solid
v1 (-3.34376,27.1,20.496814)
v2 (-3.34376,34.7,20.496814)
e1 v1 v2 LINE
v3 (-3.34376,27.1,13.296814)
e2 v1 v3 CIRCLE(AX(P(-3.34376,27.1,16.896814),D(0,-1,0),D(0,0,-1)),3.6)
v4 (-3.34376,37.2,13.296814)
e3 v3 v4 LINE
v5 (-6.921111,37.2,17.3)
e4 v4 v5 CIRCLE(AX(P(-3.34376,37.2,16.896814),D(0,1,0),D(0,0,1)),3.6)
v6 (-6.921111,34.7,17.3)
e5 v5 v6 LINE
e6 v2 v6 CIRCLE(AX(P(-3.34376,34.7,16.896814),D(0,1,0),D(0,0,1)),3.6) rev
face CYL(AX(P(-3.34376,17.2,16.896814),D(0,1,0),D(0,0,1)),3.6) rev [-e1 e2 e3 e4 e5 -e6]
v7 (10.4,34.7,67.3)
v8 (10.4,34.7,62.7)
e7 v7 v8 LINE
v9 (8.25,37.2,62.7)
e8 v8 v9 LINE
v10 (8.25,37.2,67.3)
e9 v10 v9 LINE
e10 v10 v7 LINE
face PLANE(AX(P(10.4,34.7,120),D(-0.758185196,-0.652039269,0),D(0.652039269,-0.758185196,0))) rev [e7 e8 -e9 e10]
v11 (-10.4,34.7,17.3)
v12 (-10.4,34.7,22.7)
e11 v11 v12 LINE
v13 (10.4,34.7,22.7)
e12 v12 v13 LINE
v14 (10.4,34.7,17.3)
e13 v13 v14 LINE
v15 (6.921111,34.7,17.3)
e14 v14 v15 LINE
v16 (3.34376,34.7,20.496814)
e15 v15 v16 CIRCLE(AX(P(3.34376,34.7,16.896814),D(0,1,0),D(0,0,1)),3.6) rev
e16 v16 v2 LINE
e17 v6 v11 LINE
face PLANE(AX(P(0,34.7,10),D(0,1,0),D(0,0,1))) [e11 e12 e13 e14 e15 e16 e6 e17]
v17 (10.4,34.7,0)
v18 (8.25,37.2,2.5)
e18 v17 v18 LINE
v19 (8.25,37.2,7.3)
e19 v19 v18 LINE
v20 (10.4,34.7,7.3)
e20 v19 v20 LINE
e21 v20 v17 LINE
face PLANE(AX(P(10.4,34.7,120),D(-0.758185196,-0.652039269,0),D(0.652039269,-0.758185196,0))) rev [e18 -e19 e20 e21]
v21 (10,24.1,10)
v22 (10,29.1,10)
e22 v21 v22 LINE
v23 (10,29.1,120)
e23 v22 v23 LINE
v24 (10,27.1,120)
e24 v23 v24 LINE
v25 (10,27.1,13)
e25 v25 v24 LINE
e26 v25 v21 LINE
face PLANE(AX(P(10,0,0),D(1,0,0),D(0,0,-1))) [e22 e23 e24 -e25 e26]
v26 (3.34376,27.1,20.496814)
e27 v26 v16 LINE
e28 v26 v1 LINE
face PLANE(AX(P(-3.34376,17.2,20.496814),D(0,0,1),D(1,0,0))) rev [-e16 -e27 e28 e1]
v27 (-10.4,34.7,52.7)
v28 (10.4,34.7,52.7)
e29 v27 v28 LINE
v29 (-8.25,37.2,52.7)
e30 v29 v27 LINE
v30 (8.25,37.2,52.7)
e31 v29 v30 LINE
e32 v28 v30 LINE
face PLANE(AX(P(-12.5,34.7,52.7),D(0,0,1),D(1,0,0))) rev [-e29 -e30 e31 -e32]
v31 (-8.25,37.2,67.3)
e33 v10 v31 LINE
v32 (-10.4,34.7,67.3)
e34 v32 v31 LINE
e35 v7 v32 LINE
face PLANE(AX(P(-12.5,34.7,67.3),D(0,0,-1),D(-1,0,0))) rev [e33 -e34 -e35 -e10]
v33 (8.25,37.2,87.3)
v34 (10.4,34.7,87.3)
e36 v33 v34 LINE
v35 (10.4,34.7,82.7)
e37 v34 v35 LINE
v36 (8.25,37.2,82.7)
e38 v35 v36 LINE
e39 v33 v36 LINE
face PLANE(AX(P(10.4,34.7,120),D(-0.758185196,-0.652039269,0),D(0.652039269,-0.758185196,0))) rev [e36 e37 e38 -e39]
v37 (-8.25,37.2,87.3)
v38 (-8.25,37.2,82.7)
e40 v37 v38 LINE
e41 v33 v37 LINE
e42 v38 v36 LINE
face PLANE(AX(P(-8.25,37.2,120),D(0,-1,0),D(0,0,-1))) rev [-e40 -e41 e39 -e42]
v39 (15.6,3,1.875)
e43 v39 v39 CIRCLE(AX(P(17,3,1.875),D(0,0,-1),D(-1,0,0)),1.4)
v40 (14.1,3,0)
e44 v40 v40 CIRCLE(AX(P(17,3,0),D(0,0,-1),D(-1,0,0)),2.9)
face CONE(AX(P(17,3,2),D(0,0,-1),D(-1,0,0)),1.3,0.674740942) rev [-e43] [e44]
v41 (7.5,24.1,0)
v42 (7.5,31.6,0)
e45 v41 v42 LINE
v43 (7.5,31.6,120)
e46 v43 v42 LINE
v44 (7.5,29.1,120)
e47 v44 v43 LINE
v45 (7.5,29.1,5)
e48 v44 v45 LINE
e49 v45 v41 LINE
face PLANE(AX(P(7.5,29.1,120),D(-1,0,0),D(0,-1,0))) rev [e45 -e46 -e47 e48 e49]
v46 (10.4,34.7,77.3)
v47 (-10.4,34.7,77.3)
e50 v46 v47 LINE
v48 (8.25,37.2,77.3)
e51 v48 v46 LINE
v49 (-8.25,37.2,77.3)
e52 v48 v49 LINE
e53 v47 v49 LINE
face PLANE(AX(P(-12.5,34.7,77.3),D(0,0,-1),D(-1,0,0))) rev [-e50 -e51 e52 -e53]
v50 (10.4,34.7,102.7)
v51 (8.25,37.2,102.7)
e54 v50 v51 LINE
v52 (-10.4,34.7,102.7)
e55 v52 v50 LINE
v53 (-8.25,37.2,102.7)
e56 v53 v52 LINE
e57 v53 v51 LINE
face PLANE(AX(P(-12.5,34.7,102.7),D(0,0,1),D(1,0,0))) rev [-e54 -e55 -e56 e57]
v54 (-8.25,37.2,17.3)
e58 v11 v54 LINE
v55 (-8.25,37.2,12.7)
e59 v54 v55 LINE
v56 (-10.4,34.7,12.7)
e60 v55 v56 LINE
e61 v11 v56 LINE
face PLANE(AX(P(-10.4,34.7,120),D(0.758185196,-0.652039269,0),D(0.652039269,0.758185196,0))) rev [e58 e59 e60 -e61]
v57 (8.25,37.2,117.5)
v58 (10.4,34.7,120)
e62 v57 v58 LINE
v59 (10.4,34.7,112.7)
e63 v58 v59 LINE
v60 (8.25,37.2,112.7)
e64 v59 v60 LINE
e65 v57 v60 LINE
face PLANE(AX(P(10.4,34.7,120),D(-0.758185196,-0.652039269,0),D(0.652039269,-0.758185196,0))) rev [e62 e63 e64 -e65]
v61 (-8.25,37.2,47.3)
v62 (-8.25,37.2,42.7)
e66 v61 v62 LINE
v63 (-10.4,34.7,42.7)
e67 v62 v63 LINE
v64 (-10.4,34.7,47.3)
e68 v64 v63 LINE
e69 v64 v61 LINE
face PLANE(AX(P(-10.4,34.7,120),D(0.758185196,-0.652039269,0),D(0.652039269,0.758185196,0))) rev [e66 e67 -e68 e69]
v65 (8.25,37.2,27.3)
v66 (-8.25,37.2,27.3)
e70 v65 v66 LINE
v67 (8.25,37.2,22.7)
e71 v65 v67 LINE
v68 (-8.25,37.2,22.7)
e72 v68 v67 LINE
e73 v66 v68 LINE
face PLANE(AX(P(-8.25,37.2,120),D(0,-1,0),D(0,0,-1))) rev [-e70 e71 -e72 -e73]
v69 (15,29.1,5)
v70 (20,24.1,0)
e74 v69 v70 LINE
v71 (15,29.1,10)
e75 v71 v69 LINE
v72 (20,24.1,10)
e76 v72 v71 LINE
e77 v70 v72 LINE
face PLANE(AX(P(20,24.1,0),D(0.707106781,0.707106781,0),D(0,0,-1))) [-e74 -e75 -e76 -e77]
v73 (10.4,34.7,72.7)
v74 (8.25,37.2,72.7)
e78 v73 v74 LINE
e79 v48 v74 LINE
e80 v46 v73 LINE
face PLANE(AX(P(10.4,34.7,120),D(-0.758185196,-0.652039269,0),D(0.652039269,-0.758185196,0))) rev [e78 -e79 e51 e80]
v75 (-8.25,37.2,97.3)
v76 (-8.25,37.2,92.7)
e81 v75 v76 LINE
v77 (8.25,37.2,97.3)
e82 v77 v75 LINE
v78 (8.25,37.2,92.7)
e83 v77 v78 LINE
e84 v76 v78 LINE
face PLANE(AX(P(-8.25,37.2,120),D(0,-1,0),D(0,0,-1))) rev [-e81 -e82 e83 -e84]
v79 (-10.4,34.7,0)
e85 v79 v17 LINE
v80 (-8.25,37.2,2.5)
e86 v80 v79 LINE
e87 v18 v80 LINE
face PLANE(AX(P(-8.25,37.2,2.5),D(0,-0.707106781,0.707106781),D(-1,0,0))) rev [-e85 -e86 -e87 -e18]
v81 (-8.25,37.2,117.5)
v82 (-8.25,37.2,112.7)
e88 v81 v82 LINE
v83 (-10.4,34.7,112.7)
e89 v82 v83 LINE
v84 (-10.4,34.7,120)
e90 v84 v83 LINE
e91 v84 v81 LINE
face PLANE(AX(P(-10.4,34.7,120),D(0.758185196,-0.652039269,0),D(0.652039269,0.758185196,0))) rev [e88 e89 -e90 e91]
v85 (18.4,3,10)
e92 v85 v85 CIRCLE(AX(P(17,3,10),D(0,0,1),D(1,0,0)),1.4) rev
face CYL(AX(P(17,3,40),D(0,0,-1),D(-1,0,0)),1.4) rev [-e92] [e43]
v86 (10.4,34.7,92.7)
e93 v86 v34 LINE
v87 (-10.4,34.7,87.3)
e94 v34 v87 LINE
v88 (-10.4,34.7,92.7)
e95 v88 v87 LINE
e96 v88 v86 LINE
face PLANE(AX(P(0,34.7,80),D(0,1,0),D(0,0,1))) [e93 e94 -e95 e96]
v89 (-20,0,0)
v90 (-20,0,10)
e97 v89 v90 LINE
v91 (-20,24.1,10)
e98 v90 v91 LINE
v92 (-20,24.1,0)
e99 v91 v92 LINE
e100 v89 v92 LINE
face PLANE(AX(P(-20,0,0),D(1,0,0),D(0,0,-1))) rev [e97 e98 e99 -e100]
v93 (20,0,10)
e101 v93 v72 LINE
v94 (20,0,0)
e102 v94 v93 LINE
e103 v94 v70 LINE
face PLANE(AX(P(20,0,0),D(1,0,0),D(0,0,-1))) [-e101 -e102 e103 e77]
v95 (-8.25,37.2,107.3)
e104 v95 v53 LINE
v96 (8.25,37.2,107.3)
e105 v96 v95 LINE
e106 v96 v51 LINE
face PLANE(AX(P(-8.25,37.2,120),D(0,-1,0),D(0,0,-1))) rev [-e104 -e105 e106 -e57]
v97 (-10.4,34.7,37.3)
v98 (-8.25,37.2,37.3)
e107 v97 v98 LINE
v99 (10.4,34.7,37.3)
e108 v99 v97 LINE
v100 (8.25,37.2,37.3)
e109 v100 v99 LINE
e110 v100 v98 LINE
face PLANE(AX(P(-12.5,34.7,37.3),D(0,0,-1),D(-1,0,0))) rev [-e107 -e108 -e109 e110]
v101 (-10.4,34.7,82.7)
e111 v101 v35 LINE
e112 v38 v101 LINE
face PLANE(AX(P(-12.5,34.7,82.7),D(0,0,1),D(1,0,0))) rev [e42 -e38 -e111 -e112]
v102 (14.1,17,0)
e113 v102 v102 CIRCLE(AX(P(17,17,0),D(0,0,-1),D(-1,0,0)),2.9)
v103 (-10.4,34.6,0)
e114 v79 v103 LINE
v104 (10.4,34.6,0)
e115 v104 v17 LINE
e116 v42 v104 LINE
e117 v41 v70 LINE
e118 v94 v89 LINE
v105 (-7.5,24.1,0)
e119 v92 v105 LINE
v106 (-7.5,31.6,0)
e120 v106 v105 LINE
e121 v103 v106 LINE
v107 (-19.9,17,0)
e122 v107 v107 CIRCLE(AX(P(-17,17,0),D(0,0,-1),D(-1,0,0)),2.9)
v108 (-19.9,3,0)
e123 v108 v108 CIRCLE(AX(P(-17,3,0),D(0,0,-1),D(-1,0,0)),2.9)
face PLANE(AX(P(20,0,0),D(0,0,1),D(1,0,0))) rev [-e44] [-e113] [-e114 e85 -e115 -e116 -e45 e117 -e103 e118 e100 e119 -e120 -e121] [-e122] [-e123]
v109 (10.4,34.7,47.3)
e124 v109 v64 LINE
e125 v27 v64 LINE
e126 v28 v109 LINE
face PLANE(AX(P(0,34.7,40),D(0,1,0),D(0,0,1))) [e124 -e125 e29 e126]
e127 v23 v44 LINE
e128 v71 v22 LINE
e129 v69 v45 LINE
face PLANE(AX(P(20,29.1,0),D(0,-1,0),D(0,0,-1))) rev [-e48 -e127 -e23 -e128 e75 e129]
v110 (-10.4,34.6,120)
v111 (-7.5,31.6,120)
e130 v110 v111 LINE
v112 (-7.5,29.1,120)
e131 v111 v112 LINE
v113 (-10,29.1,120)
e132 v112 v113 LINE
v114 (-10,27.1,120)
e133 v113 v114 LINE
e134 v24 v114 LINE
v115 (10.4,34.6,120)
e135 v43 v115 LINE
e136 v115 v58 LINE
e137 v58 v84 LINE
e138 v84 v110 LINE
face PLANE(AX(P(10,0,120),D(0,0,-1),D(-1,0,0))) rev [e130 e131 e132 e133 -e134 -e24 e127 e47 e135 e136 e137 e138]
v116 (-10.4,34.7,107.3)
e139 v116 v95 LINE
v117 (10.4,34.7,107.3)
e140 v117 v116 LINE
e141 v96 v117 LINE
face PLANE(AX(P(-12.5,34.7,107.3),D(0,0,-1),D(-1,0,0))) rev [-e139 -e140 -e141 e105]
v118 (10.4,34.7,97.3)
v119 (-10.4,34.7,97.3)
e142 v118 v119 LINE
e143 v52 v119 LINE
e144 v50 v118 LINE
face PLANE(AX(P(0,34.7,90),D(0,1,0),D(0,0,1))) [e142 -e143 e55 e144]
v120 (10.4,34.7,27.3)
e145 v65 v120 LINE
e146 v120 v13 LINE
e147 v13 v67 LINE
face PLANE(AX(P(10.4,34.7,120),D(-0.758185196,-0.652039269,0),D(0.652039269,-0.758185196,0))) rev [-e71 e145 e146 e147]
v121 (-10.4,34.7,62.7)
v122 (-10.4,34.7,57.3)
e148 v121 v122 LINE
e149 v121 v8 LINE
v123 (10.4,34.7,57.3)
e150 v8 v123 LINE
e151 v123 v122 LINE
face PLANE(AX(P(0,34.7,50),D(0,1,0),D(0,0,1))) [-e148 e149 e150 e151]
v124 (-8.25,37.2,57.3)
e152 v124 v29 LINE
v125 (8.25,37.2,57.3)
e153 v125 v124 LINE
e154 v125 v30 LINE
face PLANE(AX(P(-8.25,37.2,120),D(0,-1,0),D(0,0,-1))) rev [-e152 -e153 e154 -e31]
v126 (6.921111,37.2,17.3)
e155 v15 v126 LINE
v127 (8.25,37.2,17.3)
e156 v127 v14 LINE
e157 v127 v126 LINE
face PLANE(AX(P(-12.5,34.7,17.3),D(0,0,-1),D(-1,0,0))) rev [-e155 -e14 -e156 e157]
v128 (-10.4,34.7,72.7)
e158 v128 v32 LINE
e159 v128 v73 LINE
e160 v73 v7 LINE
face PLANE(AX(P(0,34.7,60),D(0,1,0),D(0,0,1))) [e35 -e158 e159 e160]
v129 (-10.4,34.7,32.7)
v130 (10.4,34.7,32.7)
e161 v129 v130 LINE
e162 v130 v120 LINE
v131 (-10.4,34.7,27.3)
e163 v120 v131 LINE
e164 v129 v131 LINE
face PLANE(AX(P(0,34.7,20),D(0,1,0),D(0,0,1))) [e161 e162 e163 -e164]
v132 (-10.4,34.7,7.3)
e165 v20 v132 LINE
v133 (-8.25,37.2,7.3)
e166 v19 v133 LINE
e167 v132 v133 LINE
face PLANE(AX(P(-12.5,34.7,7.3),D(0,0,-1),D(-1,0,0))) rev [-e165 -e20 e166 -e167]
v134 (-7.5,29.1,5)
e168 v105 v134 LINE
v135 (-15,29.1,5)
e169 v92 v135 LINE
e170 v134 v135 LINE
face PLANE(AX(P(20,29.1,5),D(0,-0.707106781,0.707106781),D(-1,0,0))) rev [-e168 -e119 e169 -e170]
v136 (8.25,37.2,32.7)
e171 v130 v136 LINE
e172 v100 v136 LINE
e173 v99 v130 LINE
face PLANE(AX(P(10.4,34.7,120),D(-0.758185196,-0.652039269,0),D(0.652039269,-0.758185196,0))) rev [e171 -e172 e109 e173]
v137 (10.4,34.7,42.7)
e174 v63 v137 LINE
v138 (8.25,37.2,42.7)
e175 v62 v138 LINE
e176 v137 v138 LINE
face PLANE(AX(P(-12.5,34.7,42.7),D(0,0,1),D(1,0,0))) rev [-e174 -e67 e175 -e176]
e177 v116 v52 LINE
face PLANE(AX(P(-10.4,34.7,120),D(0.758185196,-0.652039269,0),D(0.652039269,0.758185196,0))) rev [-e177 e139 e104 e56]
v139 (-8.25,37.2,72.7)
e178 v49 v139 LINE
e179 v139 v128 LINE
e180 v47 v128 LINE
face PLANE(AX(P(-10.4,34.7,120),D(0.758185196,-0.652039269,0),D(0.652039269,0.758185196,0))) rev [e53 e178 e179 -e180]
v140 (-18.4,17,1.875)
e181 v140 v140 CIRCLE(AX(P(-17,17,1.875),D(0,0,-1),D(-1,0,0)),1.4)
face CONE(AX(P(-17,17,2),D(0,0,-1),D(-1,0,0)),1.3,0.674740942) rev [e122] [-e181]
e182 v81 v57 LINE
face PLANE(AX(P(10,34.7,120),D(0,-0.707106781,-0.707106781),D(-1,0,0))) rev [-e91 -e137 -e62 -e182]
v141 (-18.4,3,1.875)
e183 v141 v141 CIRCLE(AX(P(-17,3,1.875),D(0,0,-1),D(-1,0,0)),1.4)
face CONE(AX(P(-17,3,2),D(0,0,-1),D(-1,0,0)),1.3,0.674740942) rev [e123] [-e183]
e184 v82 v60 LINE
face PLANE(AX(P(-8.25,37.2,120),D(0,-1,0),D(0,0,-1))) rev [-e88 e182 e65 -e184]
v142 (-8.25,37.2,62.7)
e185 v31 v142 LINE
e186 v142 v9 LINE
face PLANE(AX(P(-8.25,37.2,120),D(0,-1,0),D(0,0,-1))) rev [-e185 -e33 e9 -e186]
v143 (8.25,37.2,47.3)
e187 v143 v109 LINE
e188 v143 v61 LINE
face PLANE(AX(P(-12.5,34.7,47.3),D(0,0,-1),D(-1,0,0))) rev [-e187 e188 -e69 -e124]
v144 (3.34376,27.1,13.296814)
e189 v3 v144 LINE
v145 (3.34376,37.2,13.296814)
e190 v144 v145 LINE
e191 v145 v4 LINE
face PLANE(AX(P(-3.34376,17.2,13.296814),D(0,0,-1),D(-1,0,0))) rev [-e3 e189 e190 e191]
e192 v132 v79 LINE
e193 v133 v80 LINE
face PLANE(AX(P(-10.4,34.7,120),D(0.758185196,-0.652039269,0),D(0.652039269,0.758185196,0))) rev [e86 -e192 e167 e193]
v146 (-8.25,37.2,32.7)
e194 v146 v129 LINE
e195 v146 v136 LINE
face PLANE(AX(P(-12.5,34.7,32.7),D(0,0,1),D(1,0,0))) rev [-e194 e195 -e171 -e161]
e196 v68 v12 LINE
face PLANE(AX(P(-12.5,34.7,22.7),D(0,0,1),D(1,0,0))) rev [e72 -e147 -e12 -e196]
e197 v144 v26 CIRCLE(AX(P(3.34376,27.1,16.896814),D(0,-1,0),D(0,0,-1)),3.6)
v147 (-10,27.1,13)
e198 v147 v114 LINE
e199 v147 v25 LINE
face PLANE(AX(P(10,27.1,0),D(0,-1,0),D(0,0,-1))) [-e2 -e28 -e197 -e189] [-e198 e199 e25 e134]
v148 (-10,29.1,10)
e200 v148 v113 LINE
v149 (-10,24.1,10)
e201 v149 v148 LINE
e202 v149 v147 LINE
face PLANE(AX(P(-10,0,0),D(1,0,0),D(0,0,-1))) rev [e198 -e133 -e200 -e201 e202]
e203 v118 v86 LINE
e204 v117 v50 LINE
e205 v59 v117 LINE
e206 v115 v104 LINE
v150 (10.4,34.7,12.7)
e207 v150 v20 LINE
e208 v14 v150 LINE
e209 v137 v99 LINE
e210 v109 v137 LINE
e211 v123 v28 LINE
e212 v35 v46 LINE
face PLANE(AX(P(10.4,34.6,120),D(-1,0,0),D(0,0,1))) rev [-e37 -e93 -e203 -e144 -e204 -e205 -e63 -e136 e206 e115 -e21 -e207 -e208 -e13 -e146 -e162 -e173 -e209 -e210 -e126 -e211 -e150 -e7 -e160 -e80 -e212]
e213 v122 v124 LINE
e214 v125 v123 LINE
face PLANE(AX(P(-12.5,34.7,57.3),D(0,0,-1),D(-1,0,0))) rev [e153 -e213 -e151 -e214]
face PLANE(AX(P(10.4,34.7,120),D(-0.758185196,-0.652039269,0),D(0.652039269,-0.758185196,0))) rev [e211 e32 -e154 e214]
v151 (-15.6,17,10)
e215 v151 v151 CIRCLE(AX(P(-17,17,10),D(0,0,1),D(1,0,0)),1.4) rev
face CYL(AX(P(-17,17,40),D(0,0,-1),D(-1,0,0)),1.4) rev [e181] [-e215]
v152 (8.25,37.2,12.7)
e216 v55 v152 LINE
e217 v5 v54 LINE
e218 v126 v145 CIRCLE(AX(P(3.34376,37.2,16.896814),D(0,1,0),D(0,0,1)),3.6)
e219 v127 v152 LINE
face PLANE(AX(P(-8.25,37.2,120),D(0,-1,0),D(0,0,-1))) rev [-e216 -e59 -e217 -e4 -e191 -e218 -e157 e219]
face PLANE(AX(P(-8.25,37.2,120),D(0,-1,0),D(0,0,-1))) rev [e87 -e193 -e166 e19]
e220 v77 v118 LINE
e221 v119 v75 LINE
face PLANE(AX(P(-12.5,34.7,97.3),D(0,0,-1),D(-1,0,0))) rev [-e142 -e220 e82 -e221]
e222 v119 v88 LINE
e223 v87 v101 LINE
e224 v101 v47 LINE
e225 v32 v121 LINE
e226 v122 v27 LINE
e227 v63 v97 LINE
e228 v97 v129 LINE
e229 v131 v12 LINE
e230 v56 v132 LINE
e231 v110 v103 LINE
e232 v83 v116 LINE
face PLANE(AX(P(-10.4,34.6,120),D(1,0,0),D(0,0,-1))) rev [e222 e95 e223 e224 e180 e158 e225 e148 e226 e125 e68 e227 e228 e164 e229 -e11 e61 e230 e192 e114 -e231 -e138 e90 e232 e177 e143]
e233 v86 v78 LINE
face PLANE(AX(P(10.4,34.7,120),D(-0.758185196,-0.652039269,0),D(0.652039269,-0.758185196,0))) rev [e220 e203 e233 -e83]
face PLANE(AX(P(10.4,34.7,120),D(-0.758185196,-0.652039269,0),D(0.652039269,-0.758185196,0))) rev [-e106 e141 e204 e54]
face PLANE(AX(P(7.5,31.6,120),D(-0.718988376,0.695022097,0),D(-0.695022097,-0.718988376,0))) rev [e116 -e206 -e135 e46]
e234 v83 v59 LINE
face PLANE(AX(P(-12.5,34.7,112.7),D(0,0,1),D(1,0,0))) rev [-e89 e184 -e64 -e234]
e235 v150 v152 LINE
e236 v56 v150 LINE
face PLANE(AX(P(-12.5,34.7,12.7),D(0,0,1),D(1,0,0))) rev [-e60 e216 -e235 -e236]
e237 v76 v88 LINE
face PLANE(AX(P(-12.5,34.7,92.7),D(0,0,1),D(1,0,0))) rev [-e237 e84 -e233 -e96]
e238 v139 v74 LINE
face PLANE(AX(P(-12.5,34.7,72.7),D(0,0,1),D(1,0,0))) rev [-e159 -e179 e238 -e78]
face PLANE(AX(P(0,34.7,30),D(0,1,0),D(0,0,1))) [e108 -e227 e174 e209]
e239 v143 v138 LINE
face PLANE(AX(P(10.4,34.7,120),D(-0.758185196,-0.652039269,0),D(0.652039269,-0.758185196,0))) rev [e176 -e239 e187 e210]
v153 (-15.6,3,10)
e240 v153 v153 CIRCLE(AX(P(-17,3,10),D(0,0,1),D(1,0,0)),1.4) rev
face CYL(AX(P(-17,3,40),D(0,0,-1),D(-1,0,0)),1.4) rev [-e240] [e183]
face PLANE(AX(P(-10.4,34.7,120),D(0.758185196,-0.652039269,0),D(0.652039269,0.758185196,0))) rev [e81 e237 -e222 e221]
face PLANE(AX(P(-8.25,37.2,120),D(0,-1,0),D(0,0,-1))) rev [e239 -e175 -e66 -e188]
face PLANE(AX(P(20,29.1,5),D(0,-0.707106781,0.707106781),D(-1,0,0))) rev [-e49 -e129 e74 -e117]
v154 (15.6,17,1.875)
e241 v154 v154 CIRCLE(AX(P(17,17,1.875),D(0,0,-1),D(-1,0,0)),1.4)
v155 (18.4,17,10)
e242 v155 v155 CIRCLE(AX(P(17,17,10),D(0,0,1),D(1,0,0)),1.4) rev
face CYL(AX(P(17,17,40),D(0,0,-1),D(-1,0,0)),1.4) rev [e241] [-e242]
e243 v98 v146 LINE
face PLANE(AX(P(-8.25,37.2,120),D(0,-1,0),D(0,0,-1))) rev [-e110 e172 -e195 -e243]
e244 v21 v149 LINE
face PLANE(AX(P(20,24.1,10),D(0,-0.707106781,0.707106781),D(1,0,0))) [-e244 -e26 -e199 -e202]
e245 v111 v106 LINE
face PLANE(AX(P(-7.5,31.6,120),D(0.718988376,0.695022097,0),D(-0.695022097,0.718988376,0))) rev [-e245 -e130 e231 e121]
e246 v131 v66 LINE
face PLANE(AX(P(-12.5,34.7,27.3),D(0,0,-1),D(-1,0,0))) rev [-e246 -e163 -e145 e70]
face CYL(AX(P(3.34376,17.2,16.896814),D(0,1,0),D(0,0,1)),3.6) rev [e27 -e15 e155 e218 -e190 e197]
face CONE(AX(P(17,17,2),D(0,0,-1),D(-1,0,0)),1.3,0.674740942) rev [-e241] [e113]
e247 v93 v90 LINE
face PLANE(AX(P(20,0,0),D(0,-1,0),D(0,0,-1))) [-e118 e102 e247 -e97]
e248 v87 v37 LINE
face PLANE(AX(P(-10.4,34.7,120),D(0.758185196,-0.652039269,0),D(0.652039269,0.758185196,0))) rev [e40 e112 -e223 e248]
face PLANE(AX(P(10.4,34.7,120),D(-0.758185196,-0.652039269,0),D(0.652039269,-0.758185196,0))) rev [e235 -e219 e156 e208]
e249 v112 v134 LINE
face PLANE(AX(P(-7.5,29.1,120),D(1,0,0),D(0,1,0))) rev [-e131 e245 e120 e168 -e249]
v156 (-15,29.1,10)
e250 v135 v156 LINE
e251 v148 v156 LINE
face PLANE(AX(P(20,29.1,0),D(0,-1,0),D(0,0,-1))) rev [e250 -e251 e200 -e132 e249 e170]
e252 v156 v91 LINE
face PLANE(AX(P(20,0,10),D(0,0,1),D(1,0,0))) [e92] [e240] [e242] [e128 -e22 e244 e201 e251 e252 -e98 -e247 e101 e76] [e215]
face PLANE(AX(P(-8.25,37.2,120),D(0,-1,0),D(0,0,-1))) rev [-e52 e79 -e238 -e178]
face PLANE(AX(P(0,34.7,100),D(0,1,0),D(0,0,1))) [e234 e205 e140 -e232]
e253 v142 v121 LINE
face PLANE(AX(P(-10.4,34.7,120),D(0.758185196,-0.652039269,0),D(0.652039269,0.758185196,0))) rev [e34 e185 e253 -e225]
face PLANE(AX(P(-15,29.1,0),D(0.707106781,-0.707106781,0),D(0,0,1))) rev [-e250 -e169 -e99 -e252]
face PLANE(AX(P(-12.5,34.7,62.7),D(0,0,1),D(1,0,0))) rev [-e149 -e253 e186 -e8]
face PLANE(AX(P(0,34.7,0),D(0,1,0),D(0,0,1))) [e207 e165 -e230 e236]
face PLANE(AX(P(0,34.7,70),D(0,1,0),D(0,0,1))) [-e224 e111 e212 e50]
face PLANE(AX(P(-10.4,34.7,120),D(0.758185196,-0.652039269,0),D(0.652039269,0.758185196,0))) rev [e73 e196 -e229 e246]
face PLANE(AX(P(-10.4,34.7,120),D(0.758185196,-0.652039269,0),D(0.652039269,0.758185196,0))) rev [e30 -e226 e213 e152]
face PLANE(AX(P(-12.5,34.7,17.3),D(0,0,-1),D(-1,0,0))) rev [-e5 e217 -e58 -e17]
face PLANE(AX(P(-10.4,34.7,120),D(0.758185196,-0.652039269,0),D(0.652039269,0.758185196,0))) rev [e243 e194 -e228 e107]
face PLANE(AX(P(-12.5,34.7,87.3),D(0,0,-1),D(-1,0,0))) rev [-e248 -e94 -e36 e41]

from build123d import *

# Parameters (mm, degrees)
EXTRUDE_1_DEPTH        = 20
SKETCH_2_R             = 1.4
CUT_EXTRUDE_1_DEPTH    = 40
SKETCH_1_3_W           = 110
SKETCH_1_3_H           = 2
EXTRUDE_2_DEPTH        = 10
EXTRUDE_3_DEPTH        = 120
CUT_EXTRUDE_2_DEPTH    = 20
SKETCH_5_W             = 25
SKETCH_5_H             = 5.4
CUT_EXTRUDE_3_DEPTH    = 2.5
PATTERN_LINEAR_1_COUNT = 11
PATTERN_LINEAR_1_PITCH = 10
CHAMFER_1_SIZE         = 3
SKETCH_6_R             = 2.9
CUT_EXTRUDE_4_DEPTH    = 2
CHAMFER_2_SIZE         = 1.6
CHAMFER_2_SIZE_2       = 2
CHAMFER_3_SIZE         = 2.5
CHAMFER_4_SIZE         = 5


with BuildPart() as part:
    # 스케치1 → 보스-돌출1 (new, symmetric)
    with BuildSketch(Plane(origin=(0, 0, 0), x_dir=(0, 0, -1), z_dir=(1, 0, 0))):
        Polygon((-10, 29.1), (-10, 27.1), (-10, 0), (0, 0), (0, 29.1), align=None)
    extrude(amount=EXTRUDE_1_DEPTH, both=True)

    # 스케치2 → 컷-돌출1 (cut)
    with BuildSketch(Plane.XY):
        with Locations((17, 3)):
            Circle(SKETCH_2_R)
        with Locations((17, 17)):
            Circle(SKETCH_2_R)
        with Locations(Location((-17, 3, 0), (0, 0, 180))):
            Circle(SKETCH_2_R)
        with Locations(Location((-17, 17, 0), (0, 0, 180))):
            Circle(SKETCH_2_R)
    extrude(amount=CUT_EXTRUDE_1_DEPTH, mode=Mode.SUBTRACT)

    # 스케치1<3> → 보스-돌출2 (add, symmetric)
    with BuildSketch(Plane(origin=(0, 0, 0), x_dir=(0, 0, -1), z_dir=(1, 0, 0))):
        with Locations((-65, 28.1)):
            Rectangle(SKETCH_1_3_W, SKETCH_1_3_H)
    extrude(amount=EXTRUDE_2_DEPTH, both=True)

    # 스케치3 → 보스-돌출3 (add)
    with BuildSketch(Plane.XY):
        Polygon((7.5, 29.1), (-7.5, 29.1), (-7.5, 31.6), (-10.4, 34.6), (-10.4, 34.7), (-8.25, 37.2), (8.25, 37.2), (10.4, 34.7), (10.4, 34.6), (7.5, 31.6), align=None)
    extrude(amount=EXTRUDE_3_DEPTH)

    # 스케치4 → 컷-돌출2 (cut)
    with BuildSketch(Plane(origin=(0, 37.2, 0), x_dir=(1, 0, 0), z_dir=(0, 1, 0))):
        with BuildLine():
            Line((-3.343759528, -13.296813629), (3.343759528, -13.296813629))
            ThreePointArc((3.343759528, -13.296813629), (6.943759528, -16.896813629), (3.343759528, -20.496813629))
            Line((3.343759528, -20.496813629), (-3.343759528, -20.496813629))
            ThreePointArc((-3.343759528, -20.496813629), (-6.943759528, -16.896813629), (-3.343759528, -13.296813629))
        make_face()
    extrude(amount=-CUT_EXTRUDE_2_DEPTH, mode=Mode.SUBTRACT)

    # 스케치5 → 컷-돌출3 (cut)
    with BuildSketch(Plane(origin=(0, 37.2, 0), x_dir=(1, 0, 0), z_dir=(0, 1, 0))):
        with Locations((0, -10)):
            Rectangle(SKETCH_5_W, SKETCH_5_H)
    cut_extrude_3 = extrude(amount=-CUT_EXTRUDE_3_DEPTH, mode=Mode.SUBTRACT)

    # 선형 패턴1: 컷-돌출3 ×11
    with Locations(*[(0, 0, i * PATTERN_LINEAR_1_PITCH) for i in range(1, PATTERN_LINEAR_1_COUNT)]):
        add(cut_extrude_3, mode=Mode.SUBTRACT)

    # 모따기1
    chamfer_1_edges = [part.edges().sort_by_distance(p)[0] for p in [
        (0, 27.1, 10),
    ]]
    chamfer(chamfer_1_edges, length=CHAMFER_1_SIZE)

    # 스케치6 → 컷-돌출4 (cut)
    with BuildSketch(Plane(origin=(0, 0, 0), x_dir=(-1, 0, 0), z_dir=(0, 0, -1))):
        with Locations((-17, 3)):
            Circle(SKETCH_6_R)
        with Locations((-17, 17)):
            Circle(SKETCH_6_R)
        with Locations((17, 17)):
            Circle(SKETCH_6_R)
        with Locations((17, 3)):
            Circle(SKETCH_6_R)
    extrude(amount=-CUT_EXTRUDE_4_DEPTH, mode=Mode.SUBTRACT)

    # 모따기2
    # the kernel refuses this chamfer: 2, 1.6 mm, written as the material it adds along each edge
    with BuildSketch(Plane(origin=(17, 3, 2), x_dir=(-1, 0, 0), z_dir=(0, -1, 0))) as chamfer_2_piece_1_section:
        Polygon((2.9 - CHAMFER_2_SIZE, 0), (2.9, CHAMFER_2_SIZE_2), (2.9, 0), align=None)
    chamfer_2_piece_1 = revolve(axis=Axis((17, 3, 2), (0, 0, -1)), mode=Mode.PRIVATE)
    chamfer_2_piece_1 = chamfer_2_piece_1 - Plane(origin=(17, 3, 0.956092246), x_dir=(1, 0, 0), z_dir=(0, 0, -1)) * Cylinder(1.4, 12, mode=Mode.PRIVATE)
    chamfer_2_piece_1 = split(chamfer_2_piece_1, bisect_by=Plane(origin=(19.173240308, 3, 0), z_dir=(0, 0, 1)), keep=Keep.TOP, mode=Mode.PRIVATE)
    add(chamfer_2_piece_1)
    with BuildSketch(Plane(origin=(-17, 3, 2), x_dir=(-1, 0, 0), z_dir=(0, -1, 0))) as chamfer_2_piece_2_section:
        Polygon((2.9 - CHAMFER_2_SIZE, 0), (2.9, CHAMFER_2_SIZE_2), (2.9, 0), align=None)
    chamfer_2_piece_2 = revolve(axis=Axis((-17, 3, 2), (0, 0, -1)), mode=Mode.PRIVATE)
    chamfer_2_piece_2 = chamfer_2_piece_2 - Plane(origin=(-17, 3, 0.956092246), x_dir=(-1, 0, 0), z_dir=(0, 0, -1)) * Cylinder(1.4, 12, mode=Mode.PRIVATE)
    chamfer_2_piece_2 = split(chamfer_2_piece_2, bisect_by=Plane(origin=(-14.826759692, 3, 0), z_dir=(0, 0, 1)), keep=Keep.TOP, mode=Mode.PRIVATE)
    add(chamfer_2_piece_2)
    with BuildSketch(Plane(origin=(-17, 17, 2), x_dir=(-1, 0, 0), z_dir=(0, -1, 0))) as chamfer_2_piece_3_section:
        Polygon((2.9 - CHAMFER_2_SIZE, 0), (2.9, CHAMFER_2_SIZE_2), (2.9, 0), align=None)
    chamfer_2_piece_3 = revolve(axis=Axis((-17, 17, 2), (0, 0, -1)), mode=Mode.PRIVATE)
    chamfer_2_piece_3 = chamfer_2_piece_3 - Plane(origin=(-17, 17, 0.956092246), x_dir=(-1, 0, 0), z_dir=(0, 0, -1)) * Cylinder(1.4, 12, mode=Mode.PRIVATE)
    chamfer_2_piece_3 = split(chamfer_2_piece_3, bisect_by=Plane(origin=(-14.826759692, 17, 0), z_dir=(0, 0, 1)), keep=Keep.TOP, mode=Mode.PRIVATE)
    add(chamfer_2_piece_3)
    with BuildSketch(Plane(origin=(17, 17, 2), x_dir=(-1, 0, 0), z_dir=(0, -1, 0))) as chamfer_2_piece_4_section:
        Polygon((2.9 - CHAMFER_2_SIZE, 0), (2.9, CHAMFER_2_SIZE_2), (2.9, 0), align=None)
    chamfer_2_piece_4 = revolve(axis=Axis((17, 17, 2), (0, 0, -1)), mode=Mode.PRIVATE)
    chamfer_2_piece_4 = chamfer_2_piece_4 - Plane(origin=(17, 17, 0.956092246), x_dir=(1, 0, 0), z_dir=(0, 0, -1)) * Cylinder(1.4, 12, mode=Mode.PRIVATE)
    chamfer_2_piece_4 = split(chamfer_2_piece_4, bisect_by=Plane(origin=(19.173240308, 17, 0), z_dir=(0, 0, 1)), keep=Keep.TOP, mode=Mode.PRIVATE)
    add(chamfer_2_piece_4)

    # 모따기3
    chamfer_3_edges = [part.edges().sort_by_distance(p)[0] for p in [
        (0, 37.2, 120),
        (0, 37.2, 0),
    ]]
    chamfer(chamfer_3_edges, length=CHAMFER_3_SIZE)

    # 모따기4
    chamfer_4_edges = [part.edges().sort_by_distance(p)[0] for p in [
        (-13.75, 29.1, 0),
        (-20, 29.1, 5),
        (20, 29.1, 5),
        (13.75, 29.1, 0),
    ]]
    chamfer(chamfer_4_edges, length=CHAMFER_4_SIZE)


solid = part.part
